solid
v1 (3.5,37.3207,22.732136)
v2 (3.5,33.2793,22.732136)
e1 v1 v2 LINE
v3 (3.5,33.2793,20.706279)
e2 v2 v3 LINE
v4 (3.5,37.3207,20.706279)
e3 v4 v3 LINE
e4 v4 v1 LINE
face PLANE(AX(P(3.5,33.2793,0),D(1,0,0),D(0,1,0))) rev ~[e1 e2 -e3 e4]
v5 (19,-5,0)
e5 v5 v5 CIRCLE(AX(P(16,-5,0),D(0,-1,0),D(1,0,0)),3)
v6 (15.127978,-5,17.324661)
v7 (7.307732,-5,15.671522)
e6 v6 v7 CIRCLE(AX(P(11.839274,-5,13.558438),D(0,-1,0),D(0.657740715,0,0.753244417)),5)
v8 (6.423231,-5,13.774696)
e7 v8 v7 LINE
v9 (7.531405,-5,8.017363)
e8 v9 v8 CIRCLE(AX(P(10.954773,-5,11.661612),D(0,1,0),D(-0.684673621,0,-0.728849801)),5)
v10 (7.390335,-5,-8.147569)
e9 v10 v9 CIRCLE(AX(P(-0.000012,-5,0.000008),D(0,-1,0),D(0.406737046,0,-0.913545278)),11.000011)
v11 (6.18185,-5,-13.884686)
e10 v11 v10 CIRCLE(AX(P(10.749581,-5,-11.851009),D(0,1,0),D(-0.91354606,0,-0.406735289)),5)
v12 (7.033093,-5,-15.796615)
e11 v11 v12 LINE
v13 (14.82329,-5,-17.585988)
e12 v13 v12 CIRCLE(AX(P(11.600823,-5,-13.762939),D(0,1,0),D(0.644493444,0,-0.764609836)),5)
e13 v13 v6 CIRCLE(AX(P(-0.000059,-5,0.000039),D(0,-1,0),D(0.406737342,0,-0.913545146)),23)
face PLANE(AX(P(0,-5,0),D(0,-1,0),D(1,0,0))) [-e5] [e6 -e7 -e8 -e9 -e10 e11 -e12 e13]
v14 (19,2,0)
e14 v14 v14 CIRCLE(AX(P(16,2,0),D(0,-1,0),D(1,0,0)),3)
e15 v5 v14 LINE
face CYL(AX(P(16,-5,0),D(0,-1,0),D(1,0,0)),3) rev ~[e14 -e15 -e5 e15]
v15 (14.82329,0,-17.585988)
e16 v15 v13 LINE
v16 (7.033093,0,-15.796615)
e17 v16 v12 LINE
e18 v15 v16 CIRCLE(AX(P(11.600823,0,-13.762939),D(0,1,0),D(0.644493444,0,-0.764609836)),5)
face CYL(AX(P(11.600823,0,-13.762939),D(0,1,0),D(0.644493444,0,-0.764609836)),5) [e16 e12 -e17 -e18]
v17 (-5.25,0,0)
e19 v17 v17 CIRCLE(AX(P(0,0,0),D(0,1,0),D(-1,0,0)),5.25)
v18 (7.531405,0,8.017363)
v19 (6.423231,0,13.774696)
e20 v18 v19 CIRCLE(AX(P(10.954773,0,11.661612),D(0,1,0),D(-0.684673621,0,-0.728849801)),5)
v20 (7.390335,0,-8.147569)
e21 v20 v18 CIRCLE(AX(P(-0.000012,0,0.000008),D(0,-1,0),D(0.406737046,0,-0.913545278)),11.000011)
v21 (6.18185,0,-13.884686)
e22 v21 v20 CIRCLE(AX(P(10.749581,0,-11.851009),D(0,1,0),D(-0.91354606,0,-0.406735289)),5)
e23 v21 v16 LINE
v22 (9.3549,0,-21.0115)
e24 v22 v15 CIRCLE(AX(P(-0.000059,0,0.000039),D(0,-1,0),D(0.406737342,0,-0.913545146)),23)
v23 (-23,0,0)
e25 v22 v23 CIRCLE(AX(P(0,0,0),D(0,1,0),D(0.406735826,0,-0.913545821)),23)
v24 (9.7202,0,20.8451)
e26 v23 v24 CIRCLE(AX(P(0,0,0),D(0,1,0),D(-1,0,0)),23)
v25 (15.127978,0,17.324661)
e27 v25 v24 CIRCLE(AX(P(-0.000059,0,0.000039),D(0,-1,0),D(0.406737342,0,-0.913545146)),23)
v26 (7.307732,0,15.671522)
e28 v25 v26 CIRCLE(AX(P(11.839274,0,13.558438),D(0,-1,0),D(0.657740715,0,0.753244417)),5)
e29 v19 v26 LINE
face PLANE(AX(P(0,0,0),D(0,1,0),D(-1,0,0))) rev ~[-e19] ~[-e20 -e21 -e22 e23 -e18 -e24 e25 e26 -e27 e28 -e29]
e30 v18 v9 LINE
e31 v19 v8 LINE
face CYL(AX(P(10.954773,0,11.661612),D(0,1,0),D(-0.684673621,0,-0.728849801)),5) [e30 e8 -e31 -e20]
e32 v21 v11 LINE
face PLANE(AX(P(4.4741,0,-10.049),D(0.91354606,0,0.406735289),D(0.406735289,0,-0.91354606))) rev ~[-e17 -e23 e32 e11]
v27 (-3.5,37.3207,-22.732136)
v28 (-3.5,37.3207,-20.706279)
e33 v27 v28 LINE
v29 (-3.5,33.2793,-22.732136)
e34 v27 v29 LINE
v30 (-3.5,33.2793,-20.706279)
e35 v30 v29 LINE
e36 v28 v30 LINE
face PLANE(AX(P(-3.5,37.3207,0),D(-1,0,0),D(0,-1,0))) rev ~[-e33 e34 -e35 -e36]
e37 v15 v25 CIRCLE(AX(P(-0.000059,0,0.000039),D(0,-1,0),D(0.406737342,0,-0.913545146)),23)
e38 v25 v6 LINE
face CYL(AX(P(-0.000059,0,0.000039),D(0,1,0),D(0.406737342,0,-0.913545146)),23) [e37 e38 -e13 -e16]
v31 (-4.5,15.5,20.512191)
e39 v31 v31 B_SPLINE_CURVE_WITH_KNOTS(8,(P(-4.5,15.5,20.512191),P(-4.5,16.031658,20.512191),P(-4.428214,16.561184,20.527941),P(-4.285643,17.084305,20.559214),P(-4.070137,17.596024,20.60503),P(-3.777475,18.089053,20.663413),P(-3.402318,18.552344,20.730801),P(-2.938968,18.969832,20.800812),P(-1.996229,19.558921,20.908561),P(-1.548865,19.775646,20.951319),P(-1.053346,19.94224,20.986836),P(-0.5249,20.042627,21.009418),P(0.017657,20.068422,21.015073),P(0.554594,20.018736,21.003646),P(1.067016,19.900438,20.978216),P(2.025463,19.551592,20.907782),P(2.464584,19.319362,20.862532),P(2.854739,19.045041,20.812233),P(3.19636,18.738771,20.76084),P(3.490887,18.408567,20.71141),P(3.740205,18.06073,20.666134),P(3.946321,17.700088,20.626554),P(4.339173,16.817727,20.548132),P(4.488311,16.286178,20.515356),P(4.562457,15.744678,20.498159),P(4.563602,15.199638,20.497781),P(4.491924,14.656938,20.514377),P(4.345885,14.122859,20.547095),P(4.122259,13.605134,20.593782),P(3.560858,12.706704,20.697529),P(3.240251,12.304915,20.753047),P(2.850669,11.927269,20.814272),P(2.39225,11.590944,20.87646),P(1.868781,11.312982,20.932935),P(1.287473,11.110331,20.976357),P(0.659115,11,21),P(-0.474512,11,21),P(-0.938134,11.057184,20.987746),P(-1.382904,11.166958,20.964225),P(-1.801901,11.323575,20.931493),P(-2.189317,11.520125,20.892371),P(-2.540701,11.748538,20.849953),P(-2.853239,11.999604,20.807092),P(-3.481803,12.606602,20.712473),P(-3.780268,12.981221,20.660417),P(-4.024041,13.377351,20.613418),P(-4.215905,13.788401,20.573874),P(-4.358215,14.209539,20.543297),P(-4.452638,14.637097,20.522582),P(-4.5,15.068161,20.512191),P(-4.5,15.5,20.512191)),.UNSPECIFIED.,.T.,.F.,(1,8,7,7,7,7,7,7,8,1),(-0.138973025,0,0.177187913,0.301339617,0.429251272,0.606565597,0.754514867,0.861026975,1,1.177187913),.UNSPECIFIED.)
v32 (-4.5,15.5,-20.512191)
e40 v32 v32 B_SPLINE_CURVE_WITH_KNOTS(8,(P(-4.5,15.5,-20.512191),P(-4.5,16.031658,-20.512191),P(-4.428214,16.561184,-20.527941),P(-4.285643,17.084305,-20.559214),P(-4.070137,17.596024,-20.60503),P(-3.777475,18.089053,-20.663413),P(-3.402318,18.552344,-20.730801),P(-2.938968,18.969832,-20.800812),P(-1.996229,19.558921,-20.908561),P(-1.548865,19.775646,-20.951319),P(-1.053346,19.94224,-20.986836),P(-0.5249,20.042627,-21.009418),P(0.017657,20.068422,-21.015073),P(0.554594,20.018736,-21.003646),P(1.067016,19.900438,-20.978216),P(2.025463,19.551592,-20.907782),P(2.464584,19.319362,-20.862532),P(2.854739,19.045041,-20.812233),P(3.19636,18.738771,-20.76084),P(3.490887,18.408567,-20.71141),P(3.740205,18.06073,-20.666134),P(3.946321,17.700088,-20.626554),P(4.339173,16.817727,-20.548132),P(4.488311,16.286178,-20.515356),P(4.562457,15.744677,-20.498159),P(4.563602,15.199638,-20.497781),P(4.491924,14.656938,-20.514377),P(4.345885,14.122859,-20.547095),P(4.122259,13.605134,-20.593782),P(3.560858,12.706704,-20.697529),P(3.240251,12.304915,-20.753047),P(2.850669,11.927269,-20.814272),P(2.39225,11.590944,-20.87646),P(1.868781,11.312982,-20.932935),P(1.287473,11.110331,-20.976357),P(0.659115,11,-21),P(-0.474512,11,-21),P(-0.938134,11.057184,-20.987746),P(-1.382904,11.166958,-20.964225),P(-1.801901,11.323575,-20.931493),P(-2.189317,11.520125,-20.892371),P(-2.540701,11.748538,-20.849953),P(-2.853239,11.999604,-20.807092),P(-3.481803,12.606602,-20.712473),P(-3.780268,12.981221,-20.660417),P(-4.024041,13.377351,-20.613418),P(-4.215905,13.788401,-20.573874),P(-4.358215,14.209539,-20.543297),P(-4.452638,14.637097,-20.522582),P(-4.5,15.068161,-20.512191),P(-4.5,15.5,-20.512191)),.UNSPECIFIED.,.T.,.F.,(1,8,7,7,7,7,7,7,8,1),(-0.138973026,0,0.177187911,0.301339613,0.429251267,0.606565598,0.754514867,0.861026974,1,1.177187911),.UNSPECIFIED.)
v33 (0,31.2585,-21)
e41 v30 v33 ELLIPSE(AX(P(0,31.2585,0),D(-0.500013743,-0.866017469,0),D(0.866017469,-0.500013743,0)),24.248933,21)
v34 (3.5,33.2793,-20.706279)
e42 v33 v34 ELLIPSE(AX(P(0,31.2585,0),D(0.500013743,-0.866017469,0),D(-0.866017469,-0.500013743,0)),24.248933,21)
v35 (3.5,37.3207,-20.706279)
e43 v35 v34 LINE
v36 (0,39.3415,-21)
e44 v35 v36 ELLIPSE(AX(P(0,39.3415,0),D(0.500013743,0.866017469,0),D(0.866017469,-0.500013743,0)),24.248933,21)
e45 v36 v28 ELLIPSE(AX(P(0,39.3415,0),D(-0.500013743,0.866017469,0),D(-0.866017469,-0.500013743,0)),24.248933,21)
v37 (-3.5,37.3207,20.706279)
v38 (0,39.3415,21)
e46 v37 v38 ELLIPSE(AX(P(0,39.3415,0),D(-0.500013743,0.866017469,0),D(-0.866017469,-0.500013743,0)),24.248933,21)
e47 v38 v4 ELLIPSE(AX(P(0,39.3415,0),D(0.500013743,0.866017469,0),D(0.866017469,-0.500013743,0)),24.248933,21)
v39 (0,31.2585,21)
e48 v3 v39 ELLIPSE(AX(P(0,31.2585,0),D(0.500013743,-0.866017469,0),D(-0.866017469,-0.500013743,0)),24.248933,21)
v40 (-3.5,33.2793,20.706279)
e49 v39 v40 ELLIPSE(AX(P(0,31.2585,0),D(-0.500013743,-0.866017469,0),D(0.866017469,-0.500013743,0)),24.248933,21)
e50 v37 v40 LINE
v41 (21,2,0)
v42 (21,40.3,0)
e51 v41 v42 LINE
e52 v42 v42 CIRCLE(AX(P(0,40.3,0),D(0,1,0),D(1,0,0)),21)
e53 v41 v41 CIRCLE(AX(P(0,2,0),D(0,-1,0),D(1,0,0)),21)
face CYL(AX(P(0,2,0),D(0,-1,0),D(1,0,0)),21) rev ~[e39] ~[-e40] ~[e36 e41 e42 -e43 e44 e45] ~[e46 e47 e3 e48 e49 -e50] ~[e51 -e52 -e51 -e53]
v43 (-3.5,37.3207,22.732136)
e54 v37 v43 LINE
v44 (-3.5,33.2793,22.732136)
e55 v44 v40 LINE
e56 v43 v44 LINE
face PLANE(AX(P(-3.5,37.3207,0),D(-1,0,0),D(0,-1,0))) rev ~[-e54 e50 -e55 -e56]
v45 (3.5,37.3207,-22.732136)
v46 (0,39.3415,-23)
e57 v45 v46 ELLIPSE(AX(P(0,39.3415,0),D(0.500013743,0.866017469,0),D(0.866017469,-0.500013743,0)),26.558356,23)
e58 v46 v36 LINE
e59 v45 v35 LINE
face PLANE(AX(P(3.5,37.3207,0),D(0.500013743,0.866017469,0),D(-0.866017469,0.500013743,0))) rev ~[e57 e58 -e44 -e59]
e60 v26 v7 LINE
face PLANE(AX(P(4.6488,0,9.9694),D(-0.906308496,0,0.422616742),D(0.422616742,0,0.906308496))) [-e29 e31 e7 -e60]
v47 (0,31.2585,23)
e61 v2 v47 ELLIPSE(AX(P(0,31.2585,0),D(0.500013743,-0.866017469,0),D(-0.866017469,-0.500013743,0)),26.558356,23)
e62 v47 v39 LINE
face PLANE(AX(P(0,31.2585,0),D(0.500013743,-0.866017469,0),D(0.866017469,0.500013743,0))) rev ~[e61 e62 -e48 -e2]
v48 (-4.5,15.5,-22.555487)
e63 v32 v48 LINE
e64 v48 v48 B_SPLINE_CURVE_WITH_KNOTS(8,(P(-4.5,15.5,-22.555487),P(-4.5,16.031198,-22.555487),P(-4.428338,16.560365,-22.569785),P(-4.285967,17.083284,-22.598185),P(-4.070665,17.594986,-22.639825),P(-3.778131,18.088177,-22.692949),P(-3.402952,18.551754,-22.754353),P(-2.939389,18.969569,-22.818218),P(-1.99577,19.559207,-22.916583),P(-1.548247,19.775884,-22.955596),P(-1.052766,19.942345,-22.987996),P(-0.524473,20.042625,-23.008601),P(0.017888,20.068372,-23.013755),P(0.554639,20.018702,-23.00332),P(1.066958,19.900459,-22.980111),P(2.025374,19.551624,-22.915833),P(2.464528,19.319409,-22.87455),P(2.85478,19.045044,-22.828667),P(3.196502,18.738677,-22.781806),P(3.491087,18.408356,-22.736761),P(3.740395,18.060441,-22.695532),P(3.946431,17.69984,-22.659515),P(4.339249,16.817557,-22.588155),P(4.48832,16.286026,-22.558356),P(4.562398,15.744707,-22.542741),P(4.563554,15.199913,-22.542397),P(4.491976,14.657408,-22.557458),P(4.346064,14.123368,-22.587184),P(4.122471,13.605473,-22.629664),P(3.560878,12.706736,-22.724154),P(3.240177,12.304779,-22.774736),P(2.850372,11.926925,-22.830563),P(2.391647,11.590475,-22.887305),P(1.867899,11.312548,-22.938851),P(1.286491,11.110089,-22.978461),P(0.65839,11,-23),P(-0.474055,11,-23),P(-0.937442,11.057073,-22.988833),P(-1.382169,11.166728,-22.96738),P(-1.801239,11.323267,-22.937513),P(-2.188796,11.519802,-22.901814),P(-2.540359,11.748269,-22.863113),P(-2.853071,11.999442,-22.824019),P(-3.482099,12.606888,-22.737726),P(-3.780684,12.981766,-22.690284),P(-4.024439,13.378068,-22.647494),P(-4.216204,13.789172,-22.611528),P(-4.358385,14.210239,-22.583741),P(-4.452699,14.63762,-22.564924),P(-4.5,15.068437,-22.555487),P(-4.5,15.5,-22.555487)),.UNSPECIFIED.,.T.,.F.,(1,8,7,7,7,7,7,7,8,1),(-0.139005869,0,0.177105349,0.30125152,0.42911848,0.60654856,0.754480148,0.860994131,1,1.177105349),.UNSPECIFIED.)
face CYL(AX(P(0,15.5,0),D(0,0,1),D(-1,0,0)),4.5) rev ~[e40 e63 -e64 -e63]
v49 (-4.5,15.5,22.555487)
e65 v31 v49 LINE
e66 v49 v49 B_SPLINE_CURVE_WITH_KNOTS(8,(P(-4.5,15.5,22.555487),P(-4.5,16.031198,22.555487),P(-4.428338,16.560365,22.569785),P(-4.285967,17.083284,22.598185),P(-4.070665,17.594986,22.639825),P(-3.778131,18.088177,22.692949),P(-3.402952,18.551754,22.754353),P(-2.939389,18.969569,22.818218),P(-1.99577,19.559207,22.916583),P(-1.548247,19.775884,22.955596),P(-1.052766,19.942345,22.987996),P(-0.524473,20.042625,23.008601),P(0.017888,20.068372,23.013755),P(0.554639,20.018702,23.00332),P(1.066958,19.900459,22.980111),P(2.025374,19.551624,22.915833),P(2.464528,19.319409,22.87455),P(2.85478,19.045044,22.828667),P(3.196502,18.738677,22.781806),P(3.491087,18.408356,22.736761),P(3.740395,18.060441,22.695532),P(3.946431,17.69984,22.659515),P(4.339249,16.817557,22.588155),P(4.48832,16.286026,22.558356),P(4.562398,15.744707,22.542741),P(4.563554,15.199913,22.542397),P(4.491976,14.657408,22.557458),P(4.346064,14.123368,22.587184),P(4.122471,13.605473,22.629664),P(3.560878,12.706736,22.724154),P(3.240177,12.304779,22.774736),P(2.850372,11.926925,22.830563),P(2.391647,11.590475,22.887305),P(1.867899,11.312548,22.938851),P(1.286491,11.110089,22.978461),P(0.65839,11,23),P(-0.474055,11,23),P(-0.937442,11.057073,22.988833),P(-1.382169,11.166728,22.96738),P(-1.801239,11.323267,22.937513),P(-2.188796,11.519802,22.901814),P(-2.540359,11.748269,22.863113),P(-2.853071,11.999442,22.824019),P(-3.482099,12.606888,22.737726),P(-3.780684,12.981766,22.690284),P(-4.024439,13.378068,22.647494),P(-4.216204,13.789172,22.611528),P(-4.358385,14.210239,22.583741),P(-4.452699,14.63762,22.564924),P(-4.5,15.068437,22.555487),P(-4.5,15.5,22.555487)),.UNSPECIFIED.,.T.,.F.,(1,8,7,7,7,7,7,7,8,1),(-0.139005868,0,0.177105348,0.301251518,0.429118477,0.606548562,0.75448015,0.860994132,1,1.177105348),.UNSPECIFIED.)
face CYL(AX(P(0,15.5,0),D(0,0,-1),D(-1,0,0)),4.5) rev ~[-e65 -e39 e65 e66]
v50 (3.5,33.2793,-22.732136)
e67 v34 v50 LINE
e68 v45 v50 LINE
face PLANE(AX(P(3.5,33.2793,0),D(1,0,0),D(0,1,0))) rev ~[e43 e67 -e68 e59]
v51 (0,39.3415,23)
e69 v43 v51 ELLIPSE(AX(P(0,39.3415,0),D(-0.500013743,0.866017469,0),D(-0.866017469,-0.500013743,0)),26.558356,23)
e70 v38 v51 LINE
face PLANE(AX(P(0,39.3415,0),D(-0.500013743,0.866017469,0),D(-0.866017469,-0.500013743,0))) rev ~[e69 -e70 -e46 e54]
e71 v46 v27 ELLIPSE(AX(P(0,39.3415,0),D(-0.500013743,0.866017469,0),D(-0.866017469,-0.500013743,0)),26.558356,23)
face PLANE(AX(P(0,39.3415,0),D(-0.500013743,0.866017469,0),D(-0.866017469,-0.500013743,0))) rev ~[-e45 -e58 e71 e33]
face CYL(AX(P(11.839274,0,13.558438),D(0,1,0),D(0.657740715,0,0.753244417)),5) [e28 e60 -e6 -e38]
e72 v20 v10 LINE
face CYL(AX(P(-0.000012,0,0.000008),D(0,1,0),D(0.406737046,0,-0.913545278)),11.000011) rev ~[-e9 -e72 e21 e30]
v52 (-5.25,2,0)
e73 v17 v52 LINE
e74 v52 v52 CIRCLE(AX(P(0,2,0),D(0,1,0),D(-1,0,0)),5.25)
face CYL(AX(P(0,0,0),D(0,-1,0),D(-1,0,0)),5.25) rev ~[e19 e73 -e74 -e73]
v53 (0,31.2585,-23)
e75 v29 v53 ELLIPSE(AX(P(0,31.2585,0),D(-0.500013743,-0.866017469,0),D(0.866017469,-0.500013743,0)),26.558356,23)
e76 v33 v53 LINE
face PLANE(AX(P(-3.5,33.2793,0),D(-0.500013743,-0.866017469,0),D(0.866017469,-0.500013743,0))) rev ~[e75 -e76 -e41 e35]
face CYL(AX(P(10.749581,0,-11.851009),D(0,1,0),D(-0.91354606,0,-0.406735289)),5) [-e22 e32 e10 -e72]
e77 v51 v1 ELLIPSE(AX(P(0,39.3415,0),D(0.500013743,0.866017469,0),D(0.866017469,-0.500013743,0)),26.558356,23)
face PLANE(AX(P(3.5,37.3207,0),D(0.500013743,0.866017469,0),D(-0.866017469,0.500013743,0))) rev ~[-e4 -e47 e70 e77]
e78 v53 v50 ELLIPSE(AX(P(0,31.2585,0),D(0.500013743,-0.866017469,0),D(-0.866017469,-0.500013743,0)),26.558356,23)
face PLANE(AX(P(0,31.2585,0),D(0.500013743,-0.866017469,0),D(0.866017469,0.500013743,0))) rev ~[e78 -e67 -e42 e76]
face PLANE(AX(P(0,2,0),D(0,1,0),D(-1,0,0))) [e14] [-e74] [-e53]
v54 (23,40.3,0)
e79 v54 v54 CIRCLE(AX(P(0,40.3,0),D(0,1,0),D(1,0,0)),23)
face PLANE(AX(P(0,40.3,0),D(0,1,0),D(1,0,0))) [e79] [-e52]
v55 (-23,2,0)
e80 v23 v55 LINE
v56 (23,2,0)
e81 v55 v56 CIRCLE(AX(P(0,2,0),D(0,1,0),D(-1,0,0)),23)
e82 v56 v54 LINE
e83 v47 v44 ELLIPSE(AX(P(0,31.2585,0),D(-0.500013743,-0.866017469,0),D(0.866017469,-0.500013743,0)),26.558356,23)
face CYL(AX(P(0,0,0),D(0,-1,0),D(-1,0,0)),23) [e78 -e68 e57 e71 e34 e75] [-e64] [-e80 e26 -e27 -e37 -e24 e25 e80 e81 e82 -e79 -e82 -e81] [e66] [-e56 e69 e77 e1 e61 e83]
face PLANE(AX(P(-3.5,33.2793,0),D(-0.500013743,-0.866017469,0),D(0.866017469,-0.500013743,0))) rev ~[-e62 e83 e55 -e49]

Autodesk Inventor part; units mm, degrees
ref_plane "YZ Plane" through (0, 0, 0) normal (1, 0, 0) x (0, 1, 0)
ref_plane "XZ Plane" through (0, 0, 0) normal (0, 1, 0) x (-1, 0, 0)
ref_plane "XY Plane" through (0, 0, 0) normal (0, 0, 1) x (1, 0, 0)
sketch "Sketch1" plane through (0, 0, 0) normal (0, 1, 0) x (-1, 0, 0)
  circle A0 centre (0, 0) radius 23
  circle A1 centre (0, 0) radius 5.25
  dimension "d0" = 46
  dimension "d3" = 10.5
extrude "Extrusion1" add sketch "Sketch1" along normal blind 2
sketch "Sketch2" plane through (0, 2, 0) normal (0, 1, 0) x (1, 0, 0)
  circle A0 centre (0, 0) radius 21
  circle A1 centre (0, 0) radius 23 projected
  line L0 (0, -23) -> (0, -21)
  line L1 (0, 21) -> (0, 23)
  dimension "d4" = 42
extrude "Extrusion2" add sketch "Sketch2" along normal blind 38.3 contours A0 L1 A1 L0 | A0 L0 A1 L1
sketch "Sketch4" plane through (0, 0, 0) normal (0, -1, 0) x (1, 0, 0)
  circle A0 centre (0, 0) radius 5.25 projected
  arc A1 (6.9145, -15.5303) -> (7.1845, 15.4072) centre (0, 0) ccw construction
  arc A2 (9.3549, -21.0115) -> (9.7202, 20.8451) centre (0, 0) ccw
  arc A3 (4.4741, -10.049) -> (4.6488, 9.9694) centre (0, 0) ccw
  arc A4 (4.4741, -10.049) -> (9.3549, -21.0115) centre (6.9145, -15.5303) ccw
  arc A5 (9.7202, 20.8451) -> (4.6488, 9.9694) centre (7.1845, 15.4072) ccw
  line L0 (0, 0) -> (7.1845, 15.4072) construction
  line L1 (0, 0) -> (17, 0) construction
  line L2 (0, 0) -> (6.9145, -15.5303) construction
  line L3 (4.4741, -10.049) -> (9.3549, -21.0115)
  line L4 (4.6488, 9.9694) -> (9.7202, 20.8451)
  line L5 (6.9145, -15.5303) -> (10.1416, -13.6436) construction
  line L6 (0, 0) -> (3.2528, 0) construction
  line L7 (0, 0) -> (2, 0) construction
  dimension "d13" = 17
  dimension "d14" = 65
  dimension "d15" = 131
  dimension "d16" = 12
extrude "Extrusion4" add sketch "Sketch4" along normal blind 5 contours L3 A3 L4 A2
fillet "Fillet1" radius 5 4 edges at (4.4741, -2.5, -10.049) (9.3549, -2.5, -21.0115) (4.6488, -2.5, 9.9694) (9.7202, -2.5, 20.8451)
sketch "Sketch7" plane through (0, -5, 0) normal (0, -1, 0) x (1, 0, 0)
  arc A0 (14.8233, -17.586) -> (15.128, 17.3247) centre (0, 0) ccw projected
  line L0 (23, 0) -> (16, 0)
  circle A1 centre (16, 0) radius 3
  dimension "d35" = 7
  dimension "d36" = 6
extrude "Extrusion7" cut sketch "Sketch7" against normal blind 10
sketch "Sketch8" plane through (0, -5, 0) normal (0, -1, 0) x (1, 0, 0)
  circle A0 centre (0, 0) radius 23 construction
  line L0 (23, 0) -> (0, 0) construction
  line L1 (0, 0) -> (0, -23) construction
sketch "Sketch9" plane through (0, 0, 0) normal (0, 0, 1) x (1, 0, 0)
  line L0 (0, 0) -> (0, 40.3) construction
  line L1 (-21, 40.3) -> (21, 40.3) construction
ref_plane "Work Plane2" through (0, 40.3, 0) normal (0, 0, -1) x (-1, 0, 0)
sketch "Sketch10" plane through (0, 40.3, 0) normal (0, 0, -1) x (-1, 0, 0)
  line L0 (-13.6647, -16.0448) -> (0, 0) construction
  line L1 (-21, 0) -> (21, 0) construction
  line L2 (0, 0) -> (0, -24.8) construction
  circle A0 centre (0, -24.8) radius 4.5
  point P0 (0, -40.3)
  dimension "d39" = 24.8
  dimension "d41" = 9
extrude "Extrusion8" cut sketch "Sketch10" along normal mid plane 66.25
sketch "Sketch11" plane through (0, 40.3, 0) normal (0, 0, -1) x (-1, 0, 0)
  line L0 (0.1725, 0) -> (0.1725, -5.1914) construction
  line L1 (-3.5, -7.0207) -> (-3.5, -2.9793)
  line L2 (-3.5, -2.9793) -> (0, -0.9585)
  line L3 (0, -0.9585) -> (3.5, -2.9793)
  line L4 (3.5, -2.9793) -> (3.5, -7.0207)
  line L5 (3.5, -7.0207) -> (0, -9.0415)
  line L6 (0, -9.0415) -> (-3.5, -7.0207)
  point P0 (0, -40.3)
  point P1 (0, -5)
extrude "Extrusion9" cut sketch "Sketch11" along normal mid plane 66.25
properties part number "BasePotentiometer_3DPrint"
